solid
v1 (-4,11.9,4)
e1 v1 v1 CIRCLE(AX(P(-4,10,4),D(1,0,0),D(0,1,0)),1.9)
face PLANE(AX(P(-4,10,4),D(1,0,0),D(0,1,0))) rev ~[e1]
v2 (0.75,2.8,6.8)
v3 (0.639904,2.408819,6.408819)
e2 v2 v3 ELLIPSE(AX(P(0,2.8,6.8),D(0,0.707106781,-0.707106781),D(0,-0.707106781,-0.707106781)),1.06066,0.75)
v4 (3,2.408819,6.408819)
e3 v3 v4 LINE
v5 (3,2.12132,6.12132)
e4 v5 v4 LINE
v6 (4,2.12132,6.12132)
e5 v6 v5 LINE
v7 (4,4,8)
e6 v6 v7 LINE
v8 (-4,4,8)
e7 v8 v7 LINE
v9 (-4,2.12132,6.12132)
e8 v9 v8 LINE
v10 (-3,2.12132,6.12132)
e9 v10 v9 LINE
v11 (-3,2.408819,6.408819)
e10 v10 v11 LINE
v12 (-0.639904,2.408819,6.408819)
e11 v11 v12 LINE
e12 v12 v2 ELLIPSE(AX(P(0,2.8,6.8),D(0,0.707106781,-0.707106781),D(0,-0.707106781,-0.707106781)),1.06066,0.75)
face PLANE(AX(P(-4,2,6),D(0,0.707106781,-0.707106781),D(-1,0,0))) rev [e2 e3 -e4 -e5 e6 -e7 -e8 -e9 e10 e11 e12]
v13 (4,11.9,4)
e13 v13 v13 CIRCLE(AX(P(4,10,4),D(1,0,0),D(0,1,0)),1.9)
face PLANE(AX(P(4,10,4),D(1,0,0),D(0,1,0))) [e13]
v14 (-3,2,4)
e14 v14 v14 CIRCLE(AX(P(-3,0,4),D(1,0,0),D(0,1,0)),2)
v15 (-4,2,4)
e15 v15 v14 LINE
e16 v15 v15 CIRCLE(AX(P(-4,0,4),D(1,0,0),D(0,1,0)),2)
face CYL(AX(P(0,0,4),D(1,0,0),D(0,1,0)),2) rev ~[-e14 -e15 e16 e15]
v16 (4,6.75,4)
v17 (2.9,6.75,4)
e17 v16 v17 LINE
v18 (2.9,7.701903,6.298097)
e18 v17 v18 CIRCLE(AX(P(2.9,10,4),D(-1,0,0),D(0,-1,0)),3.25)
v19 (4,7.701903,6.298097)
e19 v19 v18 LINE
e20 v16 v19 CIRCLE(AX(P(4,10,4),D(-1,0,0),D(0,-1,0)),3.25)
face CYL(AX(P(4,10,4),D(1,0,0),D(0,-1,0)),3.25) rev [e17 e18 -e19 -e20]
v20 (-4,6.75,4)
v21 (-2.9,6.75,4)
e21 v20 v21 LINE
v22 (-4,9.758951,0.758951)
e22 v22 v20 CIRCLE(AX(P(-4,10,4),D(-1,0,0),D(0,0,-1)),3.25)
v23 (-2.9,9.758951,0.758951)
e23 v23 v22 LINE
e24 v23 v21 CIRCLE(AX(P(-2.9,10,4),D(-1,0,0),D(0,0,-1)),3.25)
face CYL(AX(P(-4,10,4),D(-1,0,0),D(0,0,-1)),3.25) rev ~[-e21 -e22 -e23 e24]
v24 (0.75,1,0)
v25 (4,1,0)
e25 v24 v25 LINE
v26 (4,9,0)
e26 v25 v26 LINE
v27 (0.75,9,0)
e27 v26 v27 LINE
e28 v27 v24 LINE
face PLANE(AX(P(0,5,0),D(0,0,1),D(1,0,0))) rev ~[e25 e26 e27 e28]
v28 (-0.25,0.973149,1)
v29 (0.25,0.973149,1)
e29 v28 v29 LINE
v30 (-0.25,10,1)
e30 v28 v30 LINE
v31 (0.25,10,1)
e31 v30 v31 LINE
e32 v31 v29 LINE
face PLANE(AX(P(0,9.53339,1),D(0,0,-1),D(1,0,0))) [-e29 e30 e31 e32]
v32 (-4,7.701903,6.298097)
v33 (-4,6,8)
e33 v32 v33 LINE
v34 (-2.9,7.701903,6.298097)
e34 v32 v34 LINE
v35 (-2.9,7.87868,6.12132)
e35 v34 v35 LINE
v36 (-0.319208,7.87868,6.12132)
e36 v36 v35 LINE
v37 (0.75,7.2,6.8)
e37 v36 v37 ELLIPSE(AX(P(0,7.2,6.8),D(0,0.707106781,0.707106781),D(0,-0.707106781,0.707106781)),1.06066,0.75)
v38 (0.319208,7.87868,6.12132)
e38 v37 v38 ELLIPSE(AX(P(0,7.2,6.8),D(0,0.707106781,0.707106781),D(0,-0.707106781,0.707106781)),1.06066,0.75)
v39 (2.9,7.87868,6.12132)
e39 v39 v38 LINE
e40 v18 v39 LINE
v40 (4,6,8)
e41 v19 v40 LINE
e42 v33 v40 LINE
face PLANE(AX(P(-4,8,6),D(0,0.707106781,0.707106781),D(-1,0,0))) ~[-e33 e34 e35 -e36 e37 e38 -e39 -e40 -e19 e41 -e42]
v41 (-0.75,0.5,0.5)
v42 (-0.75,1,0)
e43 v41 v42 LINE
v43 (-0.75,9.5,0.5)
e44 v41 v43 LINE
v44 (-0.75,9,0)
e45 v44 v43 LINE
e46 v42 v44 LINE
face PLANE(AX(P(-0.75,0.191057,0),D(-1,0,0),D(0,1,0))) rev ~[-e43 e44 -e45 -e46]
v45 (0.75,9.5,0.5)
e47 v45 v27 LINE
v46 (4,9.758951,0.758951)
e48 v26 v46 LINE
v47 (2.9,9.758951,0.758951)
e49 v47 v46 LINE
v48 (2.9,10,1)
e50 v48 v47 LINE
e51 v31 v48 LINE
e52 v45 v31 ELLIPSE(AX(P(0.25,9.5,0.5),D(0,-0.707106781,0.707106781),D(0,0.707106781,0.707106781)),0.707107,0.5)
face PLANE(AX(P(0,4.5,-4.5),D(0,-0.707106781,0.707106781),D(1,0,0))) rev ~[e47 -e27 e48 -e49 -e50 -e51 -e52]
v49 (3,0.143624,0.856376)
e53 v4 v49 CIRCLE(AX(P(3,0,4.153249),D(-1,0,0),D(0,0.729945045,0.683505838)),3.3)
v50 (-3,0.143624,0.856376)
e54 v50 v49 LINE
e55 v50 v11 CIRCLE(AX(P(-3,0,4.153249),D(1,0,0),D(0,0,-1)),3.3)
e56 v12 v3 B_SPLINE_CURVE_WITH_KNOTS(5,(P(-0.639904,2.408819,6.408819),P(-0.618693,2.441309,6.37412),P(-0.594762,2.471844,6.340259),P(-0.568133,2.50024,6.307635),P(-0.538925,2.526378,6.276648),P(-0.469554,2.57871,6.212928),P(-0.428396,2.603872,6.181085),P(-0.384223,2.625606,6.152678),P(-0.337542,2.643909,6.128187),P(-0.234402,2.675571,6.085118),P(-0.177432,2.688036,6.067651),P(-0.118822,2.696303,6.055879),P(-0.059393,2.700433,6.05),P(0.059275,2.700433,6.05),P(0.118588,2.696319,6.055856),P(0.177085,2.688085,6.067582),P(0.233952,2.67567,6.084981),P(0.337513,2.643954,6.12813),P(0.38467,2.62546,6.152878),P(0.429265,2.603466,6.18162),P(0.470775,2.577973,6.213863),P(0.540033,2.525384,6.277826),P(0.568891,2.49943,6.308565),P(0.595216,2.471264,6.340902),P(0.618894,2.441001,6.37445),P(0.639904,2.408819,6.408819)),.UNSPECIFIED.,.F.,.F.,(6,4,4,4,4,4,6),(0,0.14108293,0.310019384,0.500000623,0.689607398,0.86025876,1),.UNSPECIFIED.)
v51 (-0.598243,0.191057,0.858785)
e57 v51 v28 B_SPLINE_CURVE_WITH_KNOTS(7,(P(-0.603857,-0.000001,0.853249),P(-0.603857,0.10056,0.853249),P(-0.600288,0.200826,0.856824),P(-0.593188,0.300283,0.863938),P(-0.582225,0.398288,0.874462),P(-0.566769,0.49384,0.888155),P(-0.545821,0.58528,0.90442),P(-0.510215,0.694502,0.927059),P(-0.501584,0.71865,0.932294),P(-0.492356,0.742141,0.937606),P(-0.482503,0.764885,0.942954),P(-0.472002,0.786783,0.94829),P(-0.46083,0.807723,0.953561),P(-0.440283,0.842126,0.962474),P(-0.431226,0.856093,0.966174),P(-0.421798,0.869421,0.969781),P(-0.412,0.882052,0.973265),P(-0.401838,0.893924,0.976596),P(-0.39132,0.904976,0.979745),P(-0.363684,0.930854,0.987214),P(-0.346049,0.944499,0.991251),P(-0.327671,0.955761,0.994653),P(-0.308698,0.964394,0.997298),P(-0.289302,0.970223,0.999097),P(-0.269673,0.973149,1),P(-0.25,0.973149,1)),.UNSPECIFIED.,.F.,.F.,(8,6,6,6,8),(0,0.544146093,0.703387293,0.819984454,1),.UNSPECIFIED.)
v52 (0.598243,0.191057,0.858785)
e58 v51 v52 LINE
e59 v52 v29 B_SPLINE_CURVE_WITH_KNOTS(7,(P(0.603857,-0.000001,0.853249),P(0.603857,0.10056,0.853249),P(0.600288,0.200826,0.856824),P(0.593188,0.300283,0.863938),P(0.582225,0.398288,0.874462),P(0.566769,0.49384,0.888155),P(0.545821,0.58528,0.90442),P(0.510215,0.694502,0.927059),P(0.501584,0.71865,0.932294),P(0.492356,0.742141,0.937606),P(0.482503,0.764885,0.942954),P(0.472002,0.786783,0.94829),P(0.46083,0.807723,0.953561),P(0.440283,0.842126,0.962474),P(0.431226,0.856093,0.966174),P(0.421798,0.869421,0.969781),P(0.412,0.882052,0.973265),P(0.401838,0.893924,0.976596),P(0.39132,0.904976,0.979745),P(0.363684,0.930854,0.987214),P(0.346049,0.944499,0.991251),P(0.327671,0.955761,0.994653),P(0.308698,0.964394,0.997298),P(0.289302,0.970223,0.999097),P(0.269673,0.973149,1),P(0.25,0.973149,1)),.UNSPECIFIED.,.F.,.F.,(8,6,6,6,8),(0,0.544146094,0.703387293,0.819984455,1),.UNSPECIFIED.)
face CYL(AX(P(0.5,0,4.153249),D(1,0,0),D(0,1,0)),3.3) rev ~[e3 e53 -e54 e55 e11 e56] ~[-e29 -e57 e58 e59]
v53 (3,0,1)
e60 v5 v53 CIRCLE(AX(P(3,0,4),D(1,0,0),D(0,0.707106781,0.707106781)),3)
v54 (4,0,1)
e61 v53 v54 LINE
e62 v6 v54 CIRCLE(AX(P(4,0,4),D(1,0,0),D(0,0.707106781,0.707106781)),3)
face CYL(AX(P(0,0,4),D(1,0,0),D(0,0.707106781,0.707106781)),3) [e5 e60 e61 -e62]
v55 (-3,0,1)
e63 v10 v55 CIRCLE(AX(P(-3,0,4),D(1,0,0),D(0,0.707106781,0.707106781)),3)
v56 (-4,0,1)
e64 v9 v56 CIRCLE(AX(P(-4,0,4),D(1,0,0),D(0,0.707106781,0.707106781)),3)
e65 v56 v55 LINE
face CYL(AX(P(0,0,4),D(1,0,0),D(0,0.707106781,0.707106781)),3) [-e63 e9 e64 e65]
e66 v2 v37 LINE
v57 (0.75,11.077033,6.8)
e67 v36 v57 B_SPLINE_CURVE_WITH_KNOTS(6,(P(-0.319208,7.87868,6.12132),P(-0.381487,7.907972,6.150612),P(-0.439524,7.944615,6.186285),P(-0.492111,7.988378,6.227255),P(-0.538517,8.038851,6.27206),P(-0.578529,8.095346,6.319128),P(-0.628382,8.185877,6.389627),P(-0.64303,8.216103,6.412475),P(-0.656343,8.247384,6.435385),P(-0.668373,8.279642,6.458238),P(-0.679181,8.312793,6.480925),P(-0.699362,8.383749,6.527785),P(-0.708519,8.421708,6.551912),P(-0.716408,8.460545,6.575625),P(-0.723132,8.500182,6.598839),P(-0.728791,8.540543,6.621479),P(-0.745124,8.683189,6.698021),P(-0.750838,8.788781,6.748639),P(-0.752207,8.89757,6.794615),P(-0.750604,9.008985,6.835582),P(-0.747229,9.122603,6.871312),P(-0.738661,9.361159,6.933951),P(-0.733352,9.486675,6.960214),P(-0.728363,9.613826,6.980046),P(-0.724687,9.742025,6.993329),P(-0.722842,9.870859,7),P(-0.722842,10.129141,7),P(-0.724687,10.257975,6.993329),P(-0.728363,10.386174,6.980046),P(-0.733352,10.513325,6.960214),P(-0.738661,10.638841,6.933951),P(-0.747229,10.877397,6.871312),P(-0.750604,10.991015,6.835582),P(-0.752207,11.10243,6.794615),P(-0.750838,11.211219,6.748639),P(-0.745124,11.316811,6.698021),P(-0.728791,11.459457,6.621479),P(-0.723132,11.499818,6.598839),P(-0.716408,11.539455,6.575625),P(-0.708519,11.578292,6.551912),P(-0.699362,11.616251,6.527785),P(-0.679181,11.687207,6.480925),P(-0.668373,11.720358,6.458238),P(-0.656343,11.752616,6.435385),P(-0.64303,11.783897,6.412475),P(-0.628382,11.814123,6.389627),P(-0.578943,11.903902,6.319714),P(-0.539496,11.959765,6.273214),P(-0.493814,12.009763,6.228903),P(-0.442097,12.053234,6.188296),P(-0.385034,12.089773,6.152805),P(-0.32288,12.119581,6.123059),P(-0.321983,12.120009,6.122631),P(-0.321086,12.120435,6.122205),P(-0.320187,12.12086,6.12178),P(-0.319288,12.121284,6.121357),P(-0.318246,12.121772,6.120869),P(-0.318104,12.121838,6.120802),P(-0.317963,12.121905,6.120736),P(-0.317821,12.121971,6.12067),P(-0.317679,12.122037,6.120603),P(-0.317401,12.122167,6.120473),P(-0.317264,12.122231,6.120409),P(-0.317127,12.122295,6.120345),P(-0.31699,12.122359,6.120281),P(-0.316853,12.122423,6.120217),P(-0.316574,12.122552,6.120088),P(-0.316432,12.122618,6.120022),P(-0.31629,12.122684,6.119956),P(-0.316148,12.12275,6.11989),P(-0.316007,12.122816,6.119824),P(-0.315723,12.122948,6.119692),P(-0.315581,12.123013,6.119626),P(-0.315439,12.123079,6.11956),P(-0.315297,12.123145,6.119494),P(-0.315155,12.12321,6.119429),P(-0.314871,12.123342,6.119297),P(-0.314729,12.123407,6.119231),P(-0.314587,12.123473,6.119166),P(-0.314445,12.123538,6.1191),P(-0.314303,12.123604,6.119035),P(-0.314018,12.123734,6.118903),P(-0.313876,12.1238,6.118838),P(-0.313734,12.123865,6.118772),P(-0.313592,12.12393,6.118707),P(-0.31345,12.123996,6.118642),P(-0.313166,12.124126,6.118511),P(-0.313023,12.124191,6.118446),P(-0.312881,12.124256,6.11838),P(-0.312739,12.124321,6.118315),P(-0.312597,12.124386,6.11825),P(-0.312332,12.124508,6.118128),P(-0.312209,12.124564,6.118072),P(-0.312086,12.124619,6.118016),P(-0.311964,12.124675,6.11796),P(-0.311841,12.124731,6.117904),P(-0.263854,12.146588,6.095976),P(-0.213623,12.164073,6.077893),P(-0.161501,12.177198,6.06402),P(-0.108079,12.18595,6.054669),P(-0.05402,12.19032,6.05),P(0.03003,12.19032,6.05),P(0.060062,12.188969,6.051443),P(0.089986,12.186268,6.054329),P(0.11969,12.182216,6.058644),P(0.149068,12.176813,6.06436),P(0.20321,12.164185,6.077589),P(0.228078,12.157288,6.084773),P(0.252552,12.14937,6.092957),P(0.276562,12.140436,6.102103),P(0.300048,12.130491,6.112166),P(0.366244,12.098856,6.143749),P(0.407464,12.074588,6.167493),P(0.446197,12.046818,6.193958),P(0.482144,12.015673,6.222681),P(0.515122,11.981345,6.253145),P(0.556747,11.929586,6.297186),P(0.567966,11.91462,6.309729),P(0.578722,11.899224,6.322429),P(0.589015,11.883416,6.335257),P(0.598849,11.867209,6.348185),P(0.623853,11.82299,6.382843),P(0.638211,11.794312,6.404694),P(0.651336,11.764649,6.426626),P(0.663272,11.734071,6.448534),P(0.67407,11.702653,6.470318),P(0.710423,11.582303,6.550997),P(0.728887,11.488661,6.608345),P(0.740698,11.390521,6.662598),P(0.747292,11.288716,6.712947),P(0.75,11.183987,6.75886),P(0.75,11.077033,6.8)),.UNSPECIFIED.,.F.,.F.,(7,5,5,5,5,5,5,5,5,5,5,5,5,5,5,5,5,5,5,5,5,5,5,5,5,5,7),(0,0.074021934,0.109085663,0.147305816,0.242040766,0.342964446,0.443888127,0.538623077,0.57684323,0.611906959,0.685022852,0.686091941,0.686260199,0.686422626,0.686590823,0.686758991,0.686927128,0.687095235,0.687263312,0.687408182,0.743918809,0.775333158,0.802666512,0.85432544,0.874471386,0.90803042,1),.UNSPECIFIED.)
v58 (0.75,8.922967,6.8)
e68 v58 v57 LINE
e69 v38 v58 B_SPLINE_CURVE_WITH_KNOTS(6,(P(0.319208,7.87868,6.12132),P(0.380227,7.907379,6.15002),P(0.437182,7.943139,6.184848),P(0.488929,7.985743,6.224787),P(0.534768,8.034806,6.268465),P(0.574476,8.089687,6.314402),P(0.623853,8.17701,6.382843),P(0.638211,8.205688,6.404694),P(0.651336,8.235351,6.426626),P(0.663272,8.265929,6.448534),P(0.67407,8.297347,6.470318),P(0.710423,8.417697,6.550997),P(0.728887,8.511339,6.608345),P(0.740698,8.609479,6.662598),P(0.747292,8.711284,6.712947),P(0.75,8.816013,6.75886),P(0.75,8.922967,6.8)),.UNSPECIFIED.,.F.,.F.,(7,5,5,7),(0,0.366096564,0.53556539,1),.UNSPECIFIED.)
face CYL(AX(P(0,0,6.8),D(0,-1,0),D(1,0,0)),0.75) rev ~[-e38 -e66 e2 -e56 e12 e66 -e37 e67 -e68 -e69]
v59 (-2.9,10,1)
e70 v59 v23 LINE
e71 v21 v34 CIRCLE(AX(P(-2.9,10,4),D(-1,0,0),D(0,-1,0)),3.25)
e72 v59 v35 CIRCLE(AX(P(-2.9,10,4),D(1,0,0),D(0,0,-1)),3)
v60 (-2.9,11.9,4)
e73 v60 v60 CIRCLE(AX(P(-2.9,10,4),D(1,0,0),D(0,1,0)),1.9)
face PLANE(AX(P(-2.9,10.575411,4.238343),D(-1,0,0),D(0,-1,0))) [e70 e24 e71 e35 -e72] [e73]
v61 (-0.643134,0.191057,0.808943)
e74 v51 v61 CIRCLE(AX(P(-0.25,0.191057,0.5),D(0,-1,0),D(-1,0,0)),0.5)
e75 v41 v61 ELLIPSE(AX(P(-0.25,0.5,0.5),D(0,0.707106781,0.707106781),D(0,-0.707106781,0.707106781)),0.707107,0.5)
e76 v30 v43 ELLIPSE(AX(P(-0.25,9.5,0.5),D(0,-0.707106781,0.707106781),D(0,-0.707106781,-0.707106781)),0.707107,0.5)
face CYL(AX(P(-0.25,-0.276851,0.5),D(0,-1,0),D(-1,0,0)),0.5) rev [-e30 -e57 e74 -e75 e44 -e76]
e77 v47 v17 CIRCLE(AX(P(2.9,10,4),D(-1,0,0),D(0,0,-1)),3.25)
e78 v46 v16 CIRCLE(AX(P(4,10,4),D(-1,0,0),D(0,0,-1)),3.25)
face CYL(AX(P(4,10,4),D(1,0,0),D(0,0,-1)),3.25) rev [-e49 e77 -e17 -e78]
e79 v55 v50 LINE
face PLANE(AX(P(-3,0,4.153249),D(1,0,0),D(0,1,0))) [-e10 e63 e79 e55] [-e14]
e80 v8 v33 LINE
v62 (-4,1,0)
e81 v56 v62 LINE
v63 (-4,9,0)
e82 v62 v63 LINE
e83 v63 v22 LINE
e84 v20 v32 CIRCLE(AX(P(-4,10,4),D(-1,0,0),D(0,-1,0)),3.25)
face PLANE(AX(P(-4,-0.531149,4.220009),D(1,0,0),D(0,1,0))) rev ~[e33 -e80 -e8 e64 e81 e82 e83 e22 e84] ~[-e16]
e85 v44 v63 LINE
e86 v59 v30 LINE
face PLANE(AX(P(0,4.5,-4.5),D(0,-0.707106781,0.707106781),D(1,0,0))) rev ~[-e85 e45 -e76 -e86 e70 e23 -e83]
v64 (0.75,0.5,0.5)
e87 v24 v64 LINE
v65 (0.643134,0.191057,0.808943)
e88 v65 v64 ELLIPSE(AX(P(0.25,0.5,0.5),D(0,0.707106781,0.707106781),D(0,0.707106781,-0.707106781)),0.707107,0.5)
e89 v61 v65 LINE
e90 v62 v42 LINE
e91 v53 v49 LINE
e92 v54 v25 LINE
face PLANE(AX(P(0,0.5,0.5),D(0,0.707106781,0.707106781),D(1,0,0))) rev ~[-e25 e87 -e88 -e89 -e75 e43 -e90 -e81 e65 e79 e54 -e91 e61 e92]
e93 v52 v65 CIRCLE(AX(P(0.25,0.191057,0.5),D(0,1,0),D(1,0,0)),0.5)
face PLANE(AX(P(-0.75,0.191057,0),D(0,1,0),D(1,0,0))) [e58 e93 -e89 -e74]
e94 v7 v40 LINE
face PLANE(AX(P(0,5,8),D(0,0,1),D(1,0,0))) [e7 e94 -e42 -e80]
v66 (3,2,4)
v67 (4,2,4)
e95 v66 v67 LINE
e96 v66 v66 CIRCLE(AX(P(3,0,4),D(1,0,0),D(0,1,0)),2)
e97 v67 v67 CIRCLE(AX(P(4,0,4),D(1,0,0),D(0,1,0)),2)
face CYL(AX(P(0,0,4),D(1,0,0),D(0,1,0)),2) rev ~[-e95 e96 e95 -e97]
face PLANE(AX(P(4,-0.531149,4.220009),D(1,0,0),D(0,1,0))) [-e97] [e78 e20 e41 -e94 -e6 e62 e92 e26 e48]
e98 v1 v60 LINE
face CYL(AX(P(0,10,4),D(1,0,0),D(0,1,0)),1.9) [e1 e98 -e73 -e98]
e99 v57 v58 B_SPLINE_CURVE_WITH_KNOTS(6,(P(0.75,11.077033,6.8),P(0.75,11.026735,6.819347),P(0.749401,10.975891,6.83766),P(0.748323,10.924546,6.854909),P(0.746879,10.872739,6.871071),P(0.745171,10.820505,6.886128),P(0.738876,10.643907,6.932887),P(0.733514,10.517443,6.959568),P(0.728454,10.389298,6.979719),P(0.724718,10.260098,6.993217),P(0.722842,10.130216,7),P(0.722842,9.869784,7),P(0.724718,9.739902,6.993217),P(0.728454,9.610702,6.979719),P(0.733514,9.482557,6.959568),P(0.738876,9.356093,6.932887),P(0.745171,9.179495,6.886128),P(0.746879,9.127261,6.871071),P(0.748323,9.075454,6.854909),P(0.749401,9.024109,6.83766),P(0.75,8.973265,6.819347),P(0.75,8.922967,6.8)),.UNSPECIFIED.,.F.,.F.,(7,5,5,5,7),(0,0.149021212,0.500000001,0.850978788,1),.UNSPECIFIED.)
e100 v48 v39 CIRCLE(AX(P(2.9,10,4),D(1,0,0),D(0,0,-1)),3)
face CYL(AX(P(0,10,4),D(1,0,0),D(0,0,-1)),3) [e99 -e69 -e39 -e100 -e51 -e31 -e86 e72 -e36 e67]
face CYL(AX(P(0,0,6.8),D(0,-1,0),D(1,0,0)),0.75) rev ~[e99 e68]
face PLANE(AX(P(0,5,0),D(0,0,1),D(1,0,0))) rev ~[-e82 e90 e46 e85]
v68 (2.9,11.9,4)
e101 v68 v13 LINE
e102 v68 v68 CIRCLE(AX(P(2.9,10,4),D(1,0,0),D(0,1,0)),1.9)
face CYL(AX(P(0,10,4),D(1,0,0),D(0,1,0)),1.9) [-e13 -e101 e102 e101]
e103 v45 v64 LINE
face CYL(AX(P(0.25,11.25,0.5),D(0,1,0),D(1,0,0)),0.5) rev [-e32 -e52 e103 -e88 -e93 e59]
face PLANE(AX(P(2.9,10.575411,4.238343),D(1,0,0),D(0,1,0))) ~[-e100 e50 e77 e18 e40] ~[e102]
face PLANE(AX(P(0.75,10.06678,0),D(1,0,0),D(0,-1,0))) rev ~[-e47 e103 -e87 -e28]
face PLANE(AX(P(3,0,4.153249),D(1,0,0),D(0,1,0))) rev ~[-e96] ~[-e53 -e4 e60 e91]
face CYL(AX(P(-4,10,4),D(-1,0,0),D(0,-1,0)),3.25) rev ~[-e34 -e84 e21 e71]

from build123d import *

# Parameters (mm, degrees)
F0_W          = 8
F0_H          = 10
F1_DEPTH      = 8
F2_SIZE       = 4
F4_DEPTH      = 4
F5_DEPTH      = 3
F6_R          = 3.3
F7_DEPTH      = 3
F9_DEPTH      = 1.1
F11_R         = 1.9
F12_DEPTH     = 4
F13_R         = 2
F14_DEPTH     = 12.5
F15_T1_DEPTH  = 13.1433659759
F15_T6_DEPTH  = 13.1433659759
F15_S7_R      = 3
F15_T8_DEPTH  = 8
F16_W         = 1.5
F16_H         = 1.0667801354
F16_H_2       = 8
F16_H_3       = 0.8089432385
F17_DEPTH     = 1
F18_T4_DEPTH  = 11.5268513298
F18_S7_R      = 3.3
F18_T8_DEPTH  = 7
F18_T12_DEPTH = 11.5268513298
F18_S14_R     = 3.3
F18_T15_DEPTH = 7
F19_R         = 0.75
F20_DEPTH     = 25


# Not quite as in the source:
# - a fillet or chamfer that OpenCascade refuses, or shapes differently, is made with other operations: its cross-section is extruded or revolved along the edge and cut away or added


with BuildPart() as f1:
    # F0 (on Top) → F1 (new body)
    with BuildSketch(Plane.XY):
        with Locations((0, 5)):
            Rectangle(F0_W, F0_H)
    extrude(amount=F1_DEPTH)

    # F2
    f2_edges = [f1.edges().sort_by_distance(p)[0] for p in [
        (0, 0, 8),
        (0, 10, 8),
    ]]
    chamfer(f2_edges, length=F2_SIZE)

    # F3 (on Right) → F4 (join, symmetric)
    with BuildSketch(Plane.YZ):
        with BuildLine():
            ThreePointArc((2.1213203436, 6.1213203436), (-2.7716385975, 5.1480502971), (0, 1))
            Line((0, 1), (0, 4))
            Line((0, 4), (2.1213203436, 6.1213203436))
        make_face()
    extrude(amount=F4_DEPTH, both=True)

    # F3 (on Right) → F5 (join, symmetric)
    with BuildSketch(Plane.YZ):
        with BuildLine():
            Line((10, 4), (10, 1))
            ThreePointArc((10, 1), (12.1213203436, 1.8786796564), (13, 4))
            ThreePointArc((13, 4), (11.1480502971, 6.7716385975), (7.8786796564, 6.1213203436))
            Line((7.8786796564, 6.1213203436), (10, 4))
        make_face()
    extrude(amount=F5_DEPTH, both=True)

    # F6 (on Right) → F7 (cut, symmetric)
    with BuildSketch(Plane.YZ):
        with Locations((0, 4.1532493821)):
            Circle(F6_R)
    extrude(amount=F7_DEPTH, both=True, mode=Mode.SUBTRACT)

    # F8 (on face) → F9 (cut)
    with BuildSketch(Plane(origin=(-4, 0, 0), x_dir=(0, -1, 0), z_dir=(-1, 0, 0))):
        with BuildLine():
            Line((-10, 4), (-7.7019029611, 6.2980970389))
            ThreePointArc((-7.7019029611, 6.2980970389), (-13.0026084807, 5.2437211552), (-10, 0.75))
            Line((-10, 0.75), (-10, 4))
        make_face()
        with BuildLine():
            ThreePointArc((-10, 0.75), (-7.7019029611, 1.7019029611), (-6.75, 4))
            ThreePointArc((-6.75, 4), (-6.9973915193, 5.2437211552), (-7.7019029611, 6.2980970389))
            Line((-7.7019029611, 6.2980970389), (-10, 4))
            Line((-10, 4), (-10, 0.75))
        make_face()
    extrude(amount=-F9_DEPTH, mode=Mode.SUBTRACT)

    # F10: F1 across plane


with BuildPart() as f1_1:
    add(f1.part)
    add(f1.part.mirror(Plane.YZ), mode=Mode.INTERSECT)

    # F11 (on Right) → F12 (join, symmetric)
    with BuildSketch(Plane.YZ):
        with Locations((10, 4)):
            Circle(F11_R)
    extrude(amount=F12_DEPTH, both=True)

    # F13 (on Right) → F14 (cut, symmetric)
    with BuildSketch(Plane.YZ):
        with Locations((0, 4)):
            Circle(F13_R)
    extrude(amount=F14_DEPTH, both=True, mode=Mode.SUBTRACT)

    # F15: chamfer of 1 on 2 edges, made by hand

    # F15_s2 → F15_t1 (cut)
    with BuildSketch(Plane.YZ.offset(-6.571682988)):
        Polygon((1, 0), (0, 1), (0, 0), align=None)
    extrude(amount=F15_T1_DEPTH, mode=Mode.SUBTRACT)


with BuildPart() as f15_tool4:
    # F15_s5 → F15_t6 (new body)
    with BuildSketch(Plane.YZ.offset(6.571682988)):
        Polygon((9, 0), (10, 1), (10, 0), align=None)
    extrude(amount=-F15_T6_DEPTH)

    # F15_s7 → F15_t8 (cut, symmetric)
    with BuildSketch(Plane.YZ):
        with Locations((10, 4)):
            Circle(F15_S7_R)
    extrude(amount=F15_T8_DEPTH, both=True, mode=Mode.SUBTRACT)


with BuildPart() as f1_2:
    add(f1_1.part)

    # F15_t3: cut F15_tool4
    add(f15_tool4.part, mode=Mode.SUBTRACT)

    # F16 (on face) → F17 (cut)
    with BuildSketch(Plane(origin=(0, 0, 0), x_dir=(1, 0, 0), z_dir=(0, 0, -1))):
        with Locations((0, -9.5333900677)):
            Rectangle(F16_W, F16_H)
        with Locations((0, -5)):
            Rectangle(F16_W, F16_H_2)
        with Locations((0, -0.5955283808)):
            Rectangle(F16_W, F16_H_3)
    extrude(amount=-F17_DEPTH, mode=Mode.SUBTRACT)

    # F18: fillet of radius 0.5 on 2 edges, made by hand


with BuildPart() as f18_tool2:
    # F18_s3 → F18_t4 (new body)
    with BuildSketch(Plane.XZ.offset(0.2768513298)):
        with BuildLine():
            ThreePointArc((-0.75, 0.5), (-0.6035533906, 0.8535533906), (-0.25, 1))
            Line((-0.25, 1), (-0.75, 1))
            Line((-0.75, 1), (-0.75, 0.5))
        make_face()
    extrude(amount=-F18_T4_DEPTH)

    split(bisect_by=Plane(origin=(0, 0.5, 0.5), x_dir=(1, 0, 0), z_dir=(0, 0.7071067812, 0.7071067812)), keep=Keep.TOP)

    split(bisect_by=Plane(origin=(0, 4.5, -4.5), x_dir=(1, 0, 0), z_dir=(0, -0.7071067812, 0.7071067812)), keep=Keep.TOP)

    # F18_s7 → F18_t8 (cut, symmetric)
    with BuildSketch(Plane.YZ.offset(-0.5)):
        with Locations((0, 4.1532493821)):
            Circle(F18_S7_R)
    extrude(amount=F18_T8_DEPTH, both=True, mode=Mode.SUBTRACT)


with BuildPart() as f1_3:
    add(f1_2.part)

    # F18_t1: union F18_tool2
    add(f18_tool2.part)


with BuildPart() as f18_tool10:
    # F18_s11 → F18_t12 (new body)
    with BuildSketch(Plane.XZ.offset(-11.25)):
        with BuildLine():
            ThreePointArc((0.75, 0.5), (0.6035533906, 0.8535533906), (0.25, 1))
            Line((0.25, 1), (0.75, 1))
            Line((0.75, 1), (0.75, 0.5))
        make_face()
    extrude(amount=F18_T12_DEPTH)

    split(bisect_by=Plane(origin=(0, 0.5, 0.5), x_dir=(1, 0, 0), z_dir=(0, 0.7071067812, 0.7071067812)), keep=Keep.TOP)

    # F18_s14 → F18_t15 (cut, symmetric)
    with BuildSketch(Plane.YZ.offset(0.5)):
        with Locations((0, 4.1532493821)):
            Circle(F18_S14_R)
    extrude(amount=F18_T15_DEPTH, both=True, mode=Mode.SUBTRACT)

    split(bisect_by=Plane(origin=(0, 4.5, -4.5), x_dir=(1, 0, 0), z_dir=(0, -0.7071067812, 0.7071067812)), keep=Keep.TOP)


with BuildPart() as f1_4:
    add(f1_3.part)

    # F18_t9: union F18_tool10
    add(f18_tool10.part)

    # F19 (on Front) → F20 (cut)
    with BuildSketch(Plane.XZ):
        with Locations((0, 6.8)):
            Circle(F19_R)
    extrude(amount=-F20_DEPTH, mode=Mode.SUBTRACT)


solid = f1_4.part
